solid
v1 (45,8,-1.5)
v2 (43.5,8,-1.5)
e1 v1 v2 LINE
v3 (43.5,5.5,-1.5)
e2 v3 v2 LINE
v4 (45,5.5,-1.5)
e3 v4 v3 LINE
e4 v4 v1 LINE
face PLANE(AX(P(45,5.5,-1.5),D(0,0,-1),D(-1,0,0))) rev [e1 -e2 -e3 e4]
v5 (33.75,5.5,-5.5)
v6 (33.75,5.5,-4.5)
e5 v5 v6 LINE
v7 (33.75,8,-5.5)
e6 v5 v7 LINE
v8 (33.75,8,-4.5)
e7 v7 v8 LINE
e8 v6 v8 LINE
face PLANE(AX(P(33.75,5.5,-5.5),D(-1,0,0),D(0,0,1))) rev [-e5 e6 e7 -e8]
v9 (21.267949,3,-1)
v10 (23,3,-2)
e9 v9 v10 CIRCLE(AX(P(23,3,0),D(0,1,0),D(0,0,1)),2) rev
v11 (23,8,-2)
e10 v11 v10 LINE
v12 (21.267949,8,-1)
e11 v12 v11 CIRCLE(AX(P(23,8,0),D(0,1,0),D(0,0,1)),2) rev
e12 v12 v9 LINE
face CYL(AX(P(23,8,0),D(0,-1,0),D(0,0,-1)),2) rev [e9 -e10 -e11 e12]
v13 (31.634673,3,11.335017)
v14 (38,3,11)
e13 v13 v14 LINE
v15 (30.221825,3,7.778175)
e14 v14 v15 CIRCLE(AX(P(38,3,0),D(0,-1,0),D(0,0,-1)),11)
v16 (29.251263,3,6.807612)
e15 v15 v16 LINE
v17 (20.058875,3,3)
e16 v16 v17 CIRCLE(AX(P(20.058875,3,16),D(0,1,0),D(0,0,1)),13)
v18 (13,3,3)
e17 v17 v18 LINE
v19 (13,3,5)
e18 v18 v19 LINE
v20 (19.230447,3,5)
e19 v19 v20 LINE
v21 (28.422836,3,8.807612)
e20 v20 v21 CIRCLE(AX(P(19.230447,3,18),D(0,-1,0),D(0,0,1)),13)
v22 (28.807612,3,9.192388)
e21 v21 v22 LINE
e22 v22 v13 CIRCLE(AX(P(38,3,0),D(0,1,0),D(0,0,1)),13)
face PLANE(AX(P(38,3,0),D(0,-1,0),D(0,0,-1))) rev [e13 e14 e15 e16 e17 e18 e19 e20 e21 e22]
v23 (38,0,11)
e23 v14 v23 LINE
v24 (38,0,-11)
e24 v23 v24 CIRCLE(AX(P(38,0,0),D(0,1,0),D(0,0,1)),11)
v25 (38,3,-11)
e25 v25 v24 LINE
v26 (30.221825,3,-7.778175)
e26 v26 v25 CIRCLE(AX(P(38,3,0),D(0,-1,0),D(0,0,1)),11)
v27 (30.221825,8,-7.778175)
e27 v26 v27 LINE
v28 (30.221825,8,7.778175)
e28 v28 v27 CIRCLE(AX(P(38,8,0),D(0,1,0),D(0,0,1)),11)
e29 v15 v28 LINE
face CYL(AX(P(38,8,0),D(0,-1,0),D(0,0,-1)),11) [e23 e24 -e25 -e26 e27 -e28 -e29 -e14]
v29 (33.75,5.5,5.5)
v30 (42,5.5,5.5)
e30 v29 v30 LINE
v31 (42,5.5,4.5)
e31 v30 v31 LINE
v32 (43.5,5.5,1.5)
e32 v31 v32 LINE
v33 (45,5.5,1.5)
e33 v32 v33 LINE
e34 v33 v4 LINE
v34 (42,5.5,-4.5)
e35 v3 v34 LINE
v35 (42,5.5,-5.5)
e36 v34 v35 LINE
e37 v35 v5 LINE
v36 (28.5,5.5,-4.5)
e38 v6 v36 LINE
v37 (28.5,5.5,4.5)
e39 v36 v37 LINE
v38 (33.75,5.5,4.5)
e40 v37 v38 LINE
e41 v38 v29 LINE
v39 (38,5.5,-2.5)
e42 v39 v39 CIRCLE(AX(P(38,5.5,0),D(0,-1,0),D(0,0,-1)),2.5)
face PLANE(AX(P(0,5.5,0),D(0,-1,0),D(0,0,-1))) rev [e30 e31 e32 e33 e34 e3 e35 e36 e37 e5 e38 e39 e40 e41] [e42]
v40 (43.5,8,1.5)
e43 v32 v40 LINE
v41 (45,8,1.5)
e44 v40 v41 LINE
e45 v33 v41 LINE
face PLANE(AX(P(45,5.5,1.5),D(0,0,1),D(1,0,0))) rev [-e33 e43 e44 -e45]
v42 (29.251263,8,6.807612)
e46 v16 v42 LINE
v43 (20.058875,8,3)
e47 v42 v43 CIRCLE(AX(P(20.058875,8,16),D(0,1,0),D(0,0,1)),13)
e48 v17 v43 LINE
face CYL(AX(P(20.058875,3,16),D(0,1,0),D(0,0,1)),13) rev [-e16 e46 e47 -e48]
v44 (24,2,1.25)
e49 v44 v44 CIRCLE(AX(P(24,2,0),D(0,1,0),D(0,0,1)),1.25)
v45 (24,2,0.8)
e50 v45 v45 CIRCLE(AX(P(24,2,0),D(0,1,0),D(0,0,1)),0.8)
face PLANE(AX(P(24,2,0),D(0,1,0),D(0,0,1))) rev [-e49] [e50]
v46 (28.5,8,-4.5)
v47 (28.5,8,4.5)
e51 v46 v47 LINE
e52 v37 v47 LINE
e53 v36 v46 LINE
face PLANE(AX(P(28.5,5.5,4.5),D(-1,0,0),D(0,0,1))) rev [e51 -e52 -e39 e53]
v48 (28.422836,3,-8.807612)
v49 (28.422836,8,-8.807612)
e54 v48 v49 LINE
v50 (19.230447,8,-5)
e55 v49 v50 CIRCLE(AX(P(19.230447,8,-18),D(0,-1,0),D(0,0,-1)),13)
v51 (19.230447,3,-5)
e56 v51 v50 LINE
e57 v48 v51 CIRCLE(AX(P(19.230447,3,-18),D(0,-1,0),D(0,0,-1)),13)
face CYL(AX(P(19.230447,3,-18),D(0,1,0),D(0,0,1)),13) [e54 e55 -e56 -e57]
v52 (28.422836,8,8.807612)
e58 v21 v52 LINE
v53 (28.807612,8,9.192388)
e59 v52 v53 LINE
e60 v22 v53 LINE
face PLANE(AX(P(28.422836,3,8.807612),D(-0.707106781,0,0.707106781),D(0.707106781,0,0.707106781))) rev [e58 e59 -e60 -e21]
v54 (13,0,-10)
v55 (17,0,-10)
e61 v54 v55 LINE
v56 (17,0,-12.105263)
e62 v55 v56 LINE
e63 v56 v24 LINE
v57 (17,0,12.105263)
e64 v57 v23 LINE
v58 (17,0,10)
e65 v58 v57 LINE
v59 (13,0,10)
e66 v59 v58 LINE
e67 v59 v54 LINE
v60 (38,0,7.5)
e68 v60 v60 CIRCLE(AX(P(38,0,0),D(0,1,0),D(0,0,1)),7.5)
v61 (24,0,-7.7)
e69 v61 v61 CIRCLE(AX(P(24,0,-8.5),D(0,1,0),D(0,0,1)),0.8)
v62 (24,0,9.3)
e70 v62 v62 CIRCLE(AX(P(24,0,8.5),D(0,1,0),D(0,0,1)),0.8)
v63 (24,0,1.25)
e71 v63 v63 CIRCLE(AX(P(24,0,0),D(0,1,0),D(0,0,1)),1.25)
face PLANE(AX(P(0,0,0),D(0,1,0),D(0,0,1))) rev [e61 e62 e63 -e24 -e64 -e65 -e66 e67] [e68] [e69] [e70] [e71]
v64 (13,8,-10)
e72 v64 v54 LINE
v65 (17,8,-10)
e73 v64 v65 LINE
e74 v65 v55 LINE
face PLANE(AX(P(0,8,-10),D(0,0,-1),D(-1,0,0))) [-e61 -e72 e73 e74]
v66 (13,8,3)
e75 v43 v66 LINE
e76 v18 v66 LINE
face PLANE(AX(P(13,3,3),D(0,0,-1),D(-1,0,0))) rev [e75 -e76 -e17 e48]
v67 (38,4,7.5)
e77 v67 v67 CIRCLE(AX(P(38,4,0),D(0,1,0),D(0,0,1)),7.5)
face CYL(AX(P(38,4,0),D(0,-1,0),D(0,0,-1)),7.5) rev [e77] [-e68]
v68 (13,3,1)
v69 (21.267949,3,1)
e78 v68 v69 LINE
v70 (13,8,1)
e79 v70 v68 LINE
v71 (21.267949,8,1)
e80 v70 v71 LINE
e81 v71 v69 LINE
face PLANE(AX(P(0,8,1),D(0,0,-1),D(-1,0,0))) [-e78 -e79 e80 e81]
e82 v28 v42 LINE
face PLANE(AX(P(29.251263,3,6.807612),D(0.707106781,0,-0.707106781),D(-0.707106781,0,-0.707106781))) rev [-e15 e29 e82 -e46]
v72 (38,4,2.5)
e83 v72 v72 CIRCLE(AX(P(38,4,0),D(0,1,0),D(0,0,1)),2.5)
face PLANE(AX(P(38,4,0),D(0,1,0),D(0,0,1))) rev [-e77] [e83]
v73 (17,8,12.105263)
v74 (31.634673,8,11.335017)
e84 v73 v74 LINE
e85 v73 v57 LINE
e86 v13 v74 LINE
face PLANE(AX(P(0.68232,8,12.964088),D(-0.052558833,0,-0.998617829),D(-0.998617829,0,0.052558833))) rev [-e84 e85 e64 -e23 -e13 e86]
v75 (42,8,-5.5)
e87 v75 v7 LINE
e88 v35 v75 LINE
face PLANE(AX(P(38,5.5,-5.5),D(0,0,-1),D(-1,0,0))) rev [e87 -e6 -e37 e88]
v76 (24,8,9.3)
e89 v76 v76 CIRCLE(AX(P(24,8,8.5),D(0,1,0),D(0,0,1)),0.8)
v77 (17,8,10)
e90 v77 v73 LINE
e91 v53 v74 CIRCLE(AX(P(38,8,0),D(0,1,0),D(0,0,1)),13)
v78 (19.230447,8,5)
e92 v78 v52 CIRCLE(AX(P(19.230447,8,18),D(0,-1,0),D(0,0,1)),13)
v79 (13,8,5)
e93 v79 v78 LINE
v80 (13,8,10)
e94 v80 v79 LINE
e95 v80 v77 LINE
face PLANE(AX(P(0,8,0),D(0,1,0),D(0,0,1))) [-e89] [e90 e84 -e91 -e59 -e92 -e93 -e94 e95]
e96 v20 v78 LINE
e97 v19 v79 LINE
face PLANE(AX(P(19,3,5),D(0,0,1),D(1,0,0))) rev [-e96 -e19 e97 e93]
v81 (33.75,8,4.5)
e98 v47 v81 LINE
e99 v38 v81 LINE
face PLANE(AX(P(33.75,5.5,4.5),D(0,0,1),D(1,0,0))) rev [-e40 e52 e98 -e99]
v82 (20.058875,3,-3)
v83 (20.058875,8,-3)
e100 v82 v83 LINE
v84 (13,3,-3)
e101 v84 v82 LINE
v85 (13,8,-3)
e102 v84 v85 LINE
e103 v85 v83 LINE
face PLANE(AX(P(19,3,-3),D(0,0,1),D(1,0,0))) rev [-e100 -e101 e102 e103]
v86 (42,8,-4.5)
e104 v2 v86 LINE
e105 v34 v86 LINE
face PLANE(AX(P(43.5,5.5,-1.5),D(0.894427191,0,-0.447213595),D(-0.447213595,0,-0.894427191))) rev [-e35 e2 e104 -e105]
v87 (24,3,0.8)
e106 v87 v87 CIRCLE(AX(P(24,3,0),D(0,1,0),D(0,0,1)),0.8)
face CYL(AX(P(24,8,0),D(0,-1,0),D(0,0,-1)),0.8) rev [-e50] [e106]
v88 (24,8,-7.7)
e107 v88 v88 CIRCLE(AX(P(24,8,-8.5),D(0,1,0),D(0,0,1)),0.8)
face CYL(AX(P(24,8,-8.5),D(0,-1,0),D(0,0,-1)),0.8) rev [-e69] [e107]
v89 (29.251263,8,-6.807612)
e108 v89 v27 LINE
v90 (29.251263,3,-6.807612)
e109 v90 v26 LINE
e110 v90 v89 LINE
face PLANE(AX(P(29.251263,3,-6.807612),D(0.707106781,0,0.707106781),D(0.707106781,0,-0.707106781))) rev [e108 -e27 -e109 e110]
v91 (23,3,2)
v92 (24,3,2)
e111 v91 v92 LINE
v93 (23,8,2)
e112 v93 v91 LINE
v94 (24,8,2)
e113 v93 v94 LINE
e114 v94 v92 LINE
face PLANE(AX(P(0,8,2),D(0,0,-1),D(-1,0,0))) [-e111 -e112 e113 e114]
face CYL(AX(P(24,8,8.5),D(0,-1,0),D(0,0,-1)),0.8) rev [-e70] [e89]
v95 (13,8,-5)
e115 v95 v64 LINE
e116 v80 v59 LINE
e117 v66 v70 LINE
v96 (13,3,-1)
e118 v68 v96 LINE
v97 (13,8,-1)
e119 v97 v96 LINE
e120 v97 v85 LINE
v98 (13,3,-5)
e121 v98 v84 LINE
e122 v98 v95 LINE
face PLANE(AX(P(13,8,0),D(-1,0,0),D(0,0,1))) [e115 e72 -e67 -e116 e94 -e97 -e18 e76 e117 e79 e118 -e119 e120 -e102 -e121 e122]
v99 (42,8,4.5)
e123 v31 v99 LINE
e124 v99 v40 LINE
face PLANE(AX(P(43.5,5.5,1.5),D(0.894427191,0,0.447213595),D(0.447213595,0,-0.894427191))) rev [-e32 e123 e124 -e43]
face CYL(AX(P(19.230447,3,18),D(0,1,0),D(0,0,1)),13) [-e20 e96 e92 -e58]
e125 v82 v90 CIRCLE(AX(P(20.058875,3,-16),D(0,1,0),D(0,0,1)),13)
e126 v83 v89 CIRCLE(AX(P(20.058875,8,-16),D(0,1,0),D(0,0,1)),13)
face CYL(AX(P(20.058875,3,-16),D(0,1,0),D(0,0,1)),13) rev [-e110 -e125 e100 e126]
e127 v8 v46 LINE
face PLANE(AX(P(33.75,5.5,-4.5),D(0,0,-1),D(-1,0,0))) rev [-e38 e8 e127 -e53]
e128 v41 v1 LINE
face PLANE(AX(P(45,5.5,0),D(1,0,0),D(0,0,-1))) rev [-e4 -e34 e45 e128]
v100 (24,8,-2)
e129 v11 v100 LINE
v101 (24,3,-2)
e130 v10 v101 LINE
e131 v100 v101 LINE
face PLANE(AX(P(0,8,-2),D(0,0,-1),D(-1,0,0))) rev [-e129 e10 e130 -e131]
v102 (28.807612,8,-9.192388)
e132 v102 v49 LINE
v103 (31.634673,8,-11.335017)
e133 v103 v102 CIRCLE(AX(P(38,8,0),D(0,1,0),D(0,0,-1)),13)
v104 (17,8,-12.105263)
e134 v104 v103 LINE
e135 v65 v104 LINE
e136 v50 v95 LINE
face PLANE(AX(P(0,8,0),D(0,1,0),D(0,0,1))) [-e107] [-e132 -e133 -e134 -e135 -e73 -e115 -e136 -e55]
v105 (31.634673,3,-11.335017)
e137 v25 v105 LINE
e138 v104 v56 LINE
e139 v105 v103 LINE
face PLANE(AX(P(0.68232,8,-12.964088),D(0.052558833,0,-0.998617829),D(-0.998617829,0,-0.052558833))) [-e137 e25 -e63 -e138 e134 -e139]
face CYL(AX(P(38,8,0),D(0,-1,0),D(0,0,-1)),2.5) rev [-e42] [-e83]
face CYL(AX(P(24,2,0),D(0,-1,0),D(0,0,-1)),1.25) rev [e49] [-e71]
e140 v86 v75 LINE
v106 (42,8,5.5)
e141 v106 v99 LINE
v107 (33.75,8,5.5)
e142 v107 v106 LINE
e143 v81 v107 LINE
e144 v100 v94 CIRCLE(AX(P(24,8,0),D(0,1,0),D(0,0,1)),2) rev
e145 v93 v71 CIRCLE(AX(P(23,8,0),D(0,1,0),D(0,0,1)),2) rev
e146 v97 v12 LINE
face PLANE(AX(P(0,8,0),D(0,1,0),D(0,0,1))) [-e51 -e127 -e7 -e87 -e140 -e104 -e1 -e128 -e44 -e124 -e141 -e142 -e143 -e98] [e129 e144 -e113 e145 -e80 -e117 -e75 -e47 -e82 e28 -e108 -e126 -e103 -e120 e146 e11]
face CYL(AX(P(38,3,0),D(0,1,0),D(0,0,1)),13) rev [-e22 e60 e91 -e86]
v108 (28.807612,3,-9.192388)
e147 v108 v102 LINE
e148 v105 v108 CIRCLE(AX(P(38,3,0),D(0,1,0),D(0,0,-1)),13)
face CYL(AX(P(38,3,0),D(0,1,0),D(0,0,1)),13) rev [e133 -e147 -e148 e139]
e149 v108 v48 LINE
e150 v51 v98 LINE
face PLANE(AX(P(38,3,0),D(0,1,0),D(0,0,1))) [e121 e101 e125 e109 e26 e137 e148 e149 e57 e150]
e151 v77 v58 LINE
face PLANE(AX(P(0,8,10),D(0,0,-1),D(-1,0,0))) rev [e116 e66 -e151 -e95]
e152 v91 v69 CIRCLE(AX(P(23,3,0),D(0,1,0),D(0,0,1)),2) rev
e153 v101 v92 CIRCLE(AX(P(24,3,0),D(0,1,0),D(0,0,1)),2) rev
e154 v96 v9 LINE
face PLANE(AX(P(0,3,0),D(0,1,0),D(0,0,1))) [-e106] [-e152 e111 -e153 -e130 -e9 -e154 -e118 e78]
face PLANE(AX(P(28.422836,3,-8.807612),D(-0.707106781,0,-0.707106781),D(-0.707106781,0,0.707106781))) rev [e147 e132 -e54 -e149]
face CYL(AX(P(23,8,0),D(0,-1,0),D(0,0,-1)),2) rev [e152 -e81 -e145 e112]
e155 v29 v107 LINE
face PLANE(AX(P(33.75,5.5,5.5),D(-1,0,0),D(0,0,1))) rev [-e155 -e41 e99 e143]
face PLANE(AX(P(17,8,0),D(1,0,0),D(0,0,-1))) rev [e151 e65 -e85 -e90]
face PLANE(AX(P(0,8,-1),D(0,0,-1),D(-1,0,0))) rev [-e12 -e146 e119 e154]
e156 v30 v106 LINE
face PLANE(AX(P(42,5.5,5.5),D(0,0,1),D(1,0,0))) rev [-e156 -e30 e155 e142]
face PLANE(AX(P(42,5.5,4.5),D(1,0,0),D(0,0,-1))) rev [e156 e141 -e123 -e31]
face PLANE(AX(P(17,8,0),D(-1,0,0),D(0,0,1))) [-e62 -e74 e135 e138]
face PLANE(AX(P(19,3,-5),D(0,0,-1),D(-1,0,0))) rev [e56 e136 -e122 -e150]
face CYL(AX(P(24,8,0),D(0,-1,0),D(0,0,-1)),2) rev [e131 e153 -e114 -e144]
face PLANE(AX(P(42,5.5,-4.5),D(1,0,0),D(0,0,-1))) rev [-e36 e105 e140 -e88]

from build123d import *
from build123d.topology import SkipClean

# Parameters (mm, degrees)
SKETCH1_R                       = 2.5
BOSS_EXTRUDE1_DEPTH             = 8
SKETCH2_R                       = 0.8
SCREW_HOLES_DEPTH               = 52.103203384
SKETCH10_R                      = 1.25
SCREW_HEADS_DEPTH               = 2
DISTAL_MIDDLE_START             = 3
DISTAL_MIDDLE_CABLE_CANAL_DEPTH = 5
POT_START                       = 8
POT_INSERT_DEPTH                = 2.5
CUT_EXTRUDE1_START              = 3
CUT_EXTRUDE1_DEPTH              = 5
SKETCH7_R                       = 7.5
CUT_EXTRUDE2_DEPTH              = 4


with BuildPart() as part:
    # Sketch1 → Boss-Extrude1 (new body)
    with BuildSketch(Plane(origin=(0, 0, 0), x_dir=(1, 0, 0), z_dir=(0, 1, 0))):
        with BuildLine():
            Line((13, 10), (13, -10))
            Line((13, -10), (17, -10))
            Line((17, -10), (17, -12.105263158))
            Line((17, -12.105263158), (38, -11))
            ThreePointArc((38, -11), (49, 0), (38, 11))
            Line((38, 11), (17, 12.105263158))
            Line((17, 12.105263158), (17, 10))
            Line((17, 10), (13, 10))
        make_face()
        with Locations((38, 0)):
            Circle(SKETCH1_R, mode=Mode.SUBTRACT)
    extrude(amount=BOSS_EXTRUDE1_DEPTH)

    # Sketch2 → Screw Holes (cut, through all)
    with BuildSketch(Plane(origin=(0, 0, 0), x_dir=(1, 0, 0), z_dir=(0, 1, 0))):
        with Locations((24, 8.5)):
            Circle(SKETCH2_R)
        with Locations((24, 0)):
            Circle(SKETCH2_R)
        with Locations((24, -8.5)):
            Circle(SKETCH2_R)
    extrude(amount=SCREW_HOLES_DEPTH, mode=Mode.SUBTRACT)

    # Sketch10 → Screw Heads (cut)
    with BuildSketch(Plane(origin=(0, 0, 0), x_dir=(1, 0, 0), z_dir=(0, 1, 0))):
        with Locations((24, 0)):
            Circle(SKETCH10_R)
    extrude(amount=SCREW_HEADS_DEPTH, mode=Mode.SUBTRACT)

    # Sketch 3 → Distal/Middle Cable Canal (cut)
    with SkipClean():  # the faces are left unmerged after this step: merging them gives an invalid solid
        with BuildSketch(Plane(origin=(0, 0, 0), x_dir=(1, 0, 0), z_dir=(0, 1, 0)).offset(DISTAL_MIDDLE_START)):
            with BuildLine():
                Line((19, 5), (13, 5))
                Line((13, 5), (13, 3))
                Line((13, 3), (19, 3))
                Line((19, 3), (20.058874503, 3))
                ThreePointArc((20.058874503, 3), (25.033759124, 3.989566077), (29.251262658, 6.807611845))
                Line((29.251262658, 6.807611845), (30.221825407, 7.778174593))
                ThreePointArc((30.221825407, 7.778174593), (33.790482244, 10.162674858), (38, 11))
                Line((38, 11), (31.634673214, 11.335017199))
                ThreePointArc((31.634673214, 11.335017199), (30.147717634, 10.360582109), (28.807611845, 9.192388155))
                Line((28.807611845, 9.192388155), (28.422835534, 8.807611845))
                ThreePointArc((28.422835534, 8.807611845), (24.205331999, 5.989566077), (19.230447378, 5))
                Line((19.230447378, 5), (19, 5))
            make_face()
            with BuildLine():
                Line((19, -5), (13, -5))
                Line((13, -5), (13, -3))
                Line((13, -3), (19, -3))
                Line((19, -3), (20.058874503, -3))
                ThreePointArc((20.058874503, -3), (25.033759124, -3.989566077), (29.251262658, -6.807611845))
                Line((29.251262658, -6.807611845), (30.221825407, -7.778174593))
                ThreePointArc((30.221825407, -7.778174593), (33.790482244, -10.162674858), (38, -11))
                Line((38, -11), (31.634673214, -11.335017199))
                ThreePointArc((31.634673214, -11.335017199), (30.147717634, -10.360582109), (28.807611845, -9.192388155))
                Line((28.807611845, -9.192388155), (28.422835534, -8.807611845))
                ThreePointArc((28.422835534, -8.807611845), (24.205331999, -5.989566077), (19.230447378, -5))
                Line((19.230447378, -5), (19, -5))
            make_face()
        extrude(amount=DISTAL_MIDDLE_CABLE_CANAL_DEPTH, mode=Mode.SUBTRACT)

    # Sketch3 → Pot Insert (cut)
    with SkipClean():  # the faces are left unmerged after this step: merging them gives an invalid solid
        with BuildSketch(Plane(origin=(28.28760271, 0, 0), x_dir=(1, 0, 0), z_dir=(0, 1, 0)).offset(POT_START)):
            Polygon((16.71239729, 0), (16.71239729, 1.5), (15.21239729, 1.5), (13.71239729, 4.5), (13.71239729, 5.5), (9.71239729, 5.5), (5.46239729, 5.5), (5.46239729, 4.5), (0.21239729, 4.5), (0.21239729, 0), (0.21239729, -4.5), (5.46239729, -4.5), (5.46239729, -5.5), (9.71239729, -5.5), (13.71239729, -5.5), (13.71239729, -4.5), (15.21239729, -1.5), (16.71239729, -1.5), align=None)
        extrude(amount=-POT_INSERT_DEPTH, mode=Mode.SUBTRACT)

    # Sketch5 → Cut-Extrude1 (cut)
    with SkipClean():  # the faces are left unmerged after this step: merging them gives an invalid solid
        with BuildSketch(Plane(origin=(0, 0, 0), x_dir=(1, 0, 0), z_dir=(0, 1, 0)).offset(CUT_EXTRUDE1_START)):
            with BuildLine():
                Line((13, 1), (13, -1))
                Line((13, -1), (21.267949192, -1))
                ThreePointArc((21.267949192, -1), (22, -1.732050808), (23, -2))
                Line((23, -2), (24, -2))
                ThreePointArc((24, -2), (26, 0), (24, 2))
                Line((24, 2), (23, 2))
                ThreePointArc((23, 2), (22, 1.732050808), (21.267949192, 1))
                Line((21.267949192, 1), (13, 1))
            make_face()
        extrude(amount=CUT_EXTRUDE1_DEPTH, mode=Mode.SUBTRACT)

    # Sketch7 → Cut-Extrude2 (cut)
    with SkipClean():  # the faces are left unmerged after this step: merging them gives an invalid solid
        with BuildSketch(Plane(origin=(0, 0, 0), x_dir=(1, 0, 0), z_dir=(0, 1, 0))):
            with Locations((38, 0)):
                Circle(SKETCH7_R)
        extrude(amount=CUT_EXTRUDE2_DEPTH, mode=Mode.SUBTRACT)


solid = part.part
